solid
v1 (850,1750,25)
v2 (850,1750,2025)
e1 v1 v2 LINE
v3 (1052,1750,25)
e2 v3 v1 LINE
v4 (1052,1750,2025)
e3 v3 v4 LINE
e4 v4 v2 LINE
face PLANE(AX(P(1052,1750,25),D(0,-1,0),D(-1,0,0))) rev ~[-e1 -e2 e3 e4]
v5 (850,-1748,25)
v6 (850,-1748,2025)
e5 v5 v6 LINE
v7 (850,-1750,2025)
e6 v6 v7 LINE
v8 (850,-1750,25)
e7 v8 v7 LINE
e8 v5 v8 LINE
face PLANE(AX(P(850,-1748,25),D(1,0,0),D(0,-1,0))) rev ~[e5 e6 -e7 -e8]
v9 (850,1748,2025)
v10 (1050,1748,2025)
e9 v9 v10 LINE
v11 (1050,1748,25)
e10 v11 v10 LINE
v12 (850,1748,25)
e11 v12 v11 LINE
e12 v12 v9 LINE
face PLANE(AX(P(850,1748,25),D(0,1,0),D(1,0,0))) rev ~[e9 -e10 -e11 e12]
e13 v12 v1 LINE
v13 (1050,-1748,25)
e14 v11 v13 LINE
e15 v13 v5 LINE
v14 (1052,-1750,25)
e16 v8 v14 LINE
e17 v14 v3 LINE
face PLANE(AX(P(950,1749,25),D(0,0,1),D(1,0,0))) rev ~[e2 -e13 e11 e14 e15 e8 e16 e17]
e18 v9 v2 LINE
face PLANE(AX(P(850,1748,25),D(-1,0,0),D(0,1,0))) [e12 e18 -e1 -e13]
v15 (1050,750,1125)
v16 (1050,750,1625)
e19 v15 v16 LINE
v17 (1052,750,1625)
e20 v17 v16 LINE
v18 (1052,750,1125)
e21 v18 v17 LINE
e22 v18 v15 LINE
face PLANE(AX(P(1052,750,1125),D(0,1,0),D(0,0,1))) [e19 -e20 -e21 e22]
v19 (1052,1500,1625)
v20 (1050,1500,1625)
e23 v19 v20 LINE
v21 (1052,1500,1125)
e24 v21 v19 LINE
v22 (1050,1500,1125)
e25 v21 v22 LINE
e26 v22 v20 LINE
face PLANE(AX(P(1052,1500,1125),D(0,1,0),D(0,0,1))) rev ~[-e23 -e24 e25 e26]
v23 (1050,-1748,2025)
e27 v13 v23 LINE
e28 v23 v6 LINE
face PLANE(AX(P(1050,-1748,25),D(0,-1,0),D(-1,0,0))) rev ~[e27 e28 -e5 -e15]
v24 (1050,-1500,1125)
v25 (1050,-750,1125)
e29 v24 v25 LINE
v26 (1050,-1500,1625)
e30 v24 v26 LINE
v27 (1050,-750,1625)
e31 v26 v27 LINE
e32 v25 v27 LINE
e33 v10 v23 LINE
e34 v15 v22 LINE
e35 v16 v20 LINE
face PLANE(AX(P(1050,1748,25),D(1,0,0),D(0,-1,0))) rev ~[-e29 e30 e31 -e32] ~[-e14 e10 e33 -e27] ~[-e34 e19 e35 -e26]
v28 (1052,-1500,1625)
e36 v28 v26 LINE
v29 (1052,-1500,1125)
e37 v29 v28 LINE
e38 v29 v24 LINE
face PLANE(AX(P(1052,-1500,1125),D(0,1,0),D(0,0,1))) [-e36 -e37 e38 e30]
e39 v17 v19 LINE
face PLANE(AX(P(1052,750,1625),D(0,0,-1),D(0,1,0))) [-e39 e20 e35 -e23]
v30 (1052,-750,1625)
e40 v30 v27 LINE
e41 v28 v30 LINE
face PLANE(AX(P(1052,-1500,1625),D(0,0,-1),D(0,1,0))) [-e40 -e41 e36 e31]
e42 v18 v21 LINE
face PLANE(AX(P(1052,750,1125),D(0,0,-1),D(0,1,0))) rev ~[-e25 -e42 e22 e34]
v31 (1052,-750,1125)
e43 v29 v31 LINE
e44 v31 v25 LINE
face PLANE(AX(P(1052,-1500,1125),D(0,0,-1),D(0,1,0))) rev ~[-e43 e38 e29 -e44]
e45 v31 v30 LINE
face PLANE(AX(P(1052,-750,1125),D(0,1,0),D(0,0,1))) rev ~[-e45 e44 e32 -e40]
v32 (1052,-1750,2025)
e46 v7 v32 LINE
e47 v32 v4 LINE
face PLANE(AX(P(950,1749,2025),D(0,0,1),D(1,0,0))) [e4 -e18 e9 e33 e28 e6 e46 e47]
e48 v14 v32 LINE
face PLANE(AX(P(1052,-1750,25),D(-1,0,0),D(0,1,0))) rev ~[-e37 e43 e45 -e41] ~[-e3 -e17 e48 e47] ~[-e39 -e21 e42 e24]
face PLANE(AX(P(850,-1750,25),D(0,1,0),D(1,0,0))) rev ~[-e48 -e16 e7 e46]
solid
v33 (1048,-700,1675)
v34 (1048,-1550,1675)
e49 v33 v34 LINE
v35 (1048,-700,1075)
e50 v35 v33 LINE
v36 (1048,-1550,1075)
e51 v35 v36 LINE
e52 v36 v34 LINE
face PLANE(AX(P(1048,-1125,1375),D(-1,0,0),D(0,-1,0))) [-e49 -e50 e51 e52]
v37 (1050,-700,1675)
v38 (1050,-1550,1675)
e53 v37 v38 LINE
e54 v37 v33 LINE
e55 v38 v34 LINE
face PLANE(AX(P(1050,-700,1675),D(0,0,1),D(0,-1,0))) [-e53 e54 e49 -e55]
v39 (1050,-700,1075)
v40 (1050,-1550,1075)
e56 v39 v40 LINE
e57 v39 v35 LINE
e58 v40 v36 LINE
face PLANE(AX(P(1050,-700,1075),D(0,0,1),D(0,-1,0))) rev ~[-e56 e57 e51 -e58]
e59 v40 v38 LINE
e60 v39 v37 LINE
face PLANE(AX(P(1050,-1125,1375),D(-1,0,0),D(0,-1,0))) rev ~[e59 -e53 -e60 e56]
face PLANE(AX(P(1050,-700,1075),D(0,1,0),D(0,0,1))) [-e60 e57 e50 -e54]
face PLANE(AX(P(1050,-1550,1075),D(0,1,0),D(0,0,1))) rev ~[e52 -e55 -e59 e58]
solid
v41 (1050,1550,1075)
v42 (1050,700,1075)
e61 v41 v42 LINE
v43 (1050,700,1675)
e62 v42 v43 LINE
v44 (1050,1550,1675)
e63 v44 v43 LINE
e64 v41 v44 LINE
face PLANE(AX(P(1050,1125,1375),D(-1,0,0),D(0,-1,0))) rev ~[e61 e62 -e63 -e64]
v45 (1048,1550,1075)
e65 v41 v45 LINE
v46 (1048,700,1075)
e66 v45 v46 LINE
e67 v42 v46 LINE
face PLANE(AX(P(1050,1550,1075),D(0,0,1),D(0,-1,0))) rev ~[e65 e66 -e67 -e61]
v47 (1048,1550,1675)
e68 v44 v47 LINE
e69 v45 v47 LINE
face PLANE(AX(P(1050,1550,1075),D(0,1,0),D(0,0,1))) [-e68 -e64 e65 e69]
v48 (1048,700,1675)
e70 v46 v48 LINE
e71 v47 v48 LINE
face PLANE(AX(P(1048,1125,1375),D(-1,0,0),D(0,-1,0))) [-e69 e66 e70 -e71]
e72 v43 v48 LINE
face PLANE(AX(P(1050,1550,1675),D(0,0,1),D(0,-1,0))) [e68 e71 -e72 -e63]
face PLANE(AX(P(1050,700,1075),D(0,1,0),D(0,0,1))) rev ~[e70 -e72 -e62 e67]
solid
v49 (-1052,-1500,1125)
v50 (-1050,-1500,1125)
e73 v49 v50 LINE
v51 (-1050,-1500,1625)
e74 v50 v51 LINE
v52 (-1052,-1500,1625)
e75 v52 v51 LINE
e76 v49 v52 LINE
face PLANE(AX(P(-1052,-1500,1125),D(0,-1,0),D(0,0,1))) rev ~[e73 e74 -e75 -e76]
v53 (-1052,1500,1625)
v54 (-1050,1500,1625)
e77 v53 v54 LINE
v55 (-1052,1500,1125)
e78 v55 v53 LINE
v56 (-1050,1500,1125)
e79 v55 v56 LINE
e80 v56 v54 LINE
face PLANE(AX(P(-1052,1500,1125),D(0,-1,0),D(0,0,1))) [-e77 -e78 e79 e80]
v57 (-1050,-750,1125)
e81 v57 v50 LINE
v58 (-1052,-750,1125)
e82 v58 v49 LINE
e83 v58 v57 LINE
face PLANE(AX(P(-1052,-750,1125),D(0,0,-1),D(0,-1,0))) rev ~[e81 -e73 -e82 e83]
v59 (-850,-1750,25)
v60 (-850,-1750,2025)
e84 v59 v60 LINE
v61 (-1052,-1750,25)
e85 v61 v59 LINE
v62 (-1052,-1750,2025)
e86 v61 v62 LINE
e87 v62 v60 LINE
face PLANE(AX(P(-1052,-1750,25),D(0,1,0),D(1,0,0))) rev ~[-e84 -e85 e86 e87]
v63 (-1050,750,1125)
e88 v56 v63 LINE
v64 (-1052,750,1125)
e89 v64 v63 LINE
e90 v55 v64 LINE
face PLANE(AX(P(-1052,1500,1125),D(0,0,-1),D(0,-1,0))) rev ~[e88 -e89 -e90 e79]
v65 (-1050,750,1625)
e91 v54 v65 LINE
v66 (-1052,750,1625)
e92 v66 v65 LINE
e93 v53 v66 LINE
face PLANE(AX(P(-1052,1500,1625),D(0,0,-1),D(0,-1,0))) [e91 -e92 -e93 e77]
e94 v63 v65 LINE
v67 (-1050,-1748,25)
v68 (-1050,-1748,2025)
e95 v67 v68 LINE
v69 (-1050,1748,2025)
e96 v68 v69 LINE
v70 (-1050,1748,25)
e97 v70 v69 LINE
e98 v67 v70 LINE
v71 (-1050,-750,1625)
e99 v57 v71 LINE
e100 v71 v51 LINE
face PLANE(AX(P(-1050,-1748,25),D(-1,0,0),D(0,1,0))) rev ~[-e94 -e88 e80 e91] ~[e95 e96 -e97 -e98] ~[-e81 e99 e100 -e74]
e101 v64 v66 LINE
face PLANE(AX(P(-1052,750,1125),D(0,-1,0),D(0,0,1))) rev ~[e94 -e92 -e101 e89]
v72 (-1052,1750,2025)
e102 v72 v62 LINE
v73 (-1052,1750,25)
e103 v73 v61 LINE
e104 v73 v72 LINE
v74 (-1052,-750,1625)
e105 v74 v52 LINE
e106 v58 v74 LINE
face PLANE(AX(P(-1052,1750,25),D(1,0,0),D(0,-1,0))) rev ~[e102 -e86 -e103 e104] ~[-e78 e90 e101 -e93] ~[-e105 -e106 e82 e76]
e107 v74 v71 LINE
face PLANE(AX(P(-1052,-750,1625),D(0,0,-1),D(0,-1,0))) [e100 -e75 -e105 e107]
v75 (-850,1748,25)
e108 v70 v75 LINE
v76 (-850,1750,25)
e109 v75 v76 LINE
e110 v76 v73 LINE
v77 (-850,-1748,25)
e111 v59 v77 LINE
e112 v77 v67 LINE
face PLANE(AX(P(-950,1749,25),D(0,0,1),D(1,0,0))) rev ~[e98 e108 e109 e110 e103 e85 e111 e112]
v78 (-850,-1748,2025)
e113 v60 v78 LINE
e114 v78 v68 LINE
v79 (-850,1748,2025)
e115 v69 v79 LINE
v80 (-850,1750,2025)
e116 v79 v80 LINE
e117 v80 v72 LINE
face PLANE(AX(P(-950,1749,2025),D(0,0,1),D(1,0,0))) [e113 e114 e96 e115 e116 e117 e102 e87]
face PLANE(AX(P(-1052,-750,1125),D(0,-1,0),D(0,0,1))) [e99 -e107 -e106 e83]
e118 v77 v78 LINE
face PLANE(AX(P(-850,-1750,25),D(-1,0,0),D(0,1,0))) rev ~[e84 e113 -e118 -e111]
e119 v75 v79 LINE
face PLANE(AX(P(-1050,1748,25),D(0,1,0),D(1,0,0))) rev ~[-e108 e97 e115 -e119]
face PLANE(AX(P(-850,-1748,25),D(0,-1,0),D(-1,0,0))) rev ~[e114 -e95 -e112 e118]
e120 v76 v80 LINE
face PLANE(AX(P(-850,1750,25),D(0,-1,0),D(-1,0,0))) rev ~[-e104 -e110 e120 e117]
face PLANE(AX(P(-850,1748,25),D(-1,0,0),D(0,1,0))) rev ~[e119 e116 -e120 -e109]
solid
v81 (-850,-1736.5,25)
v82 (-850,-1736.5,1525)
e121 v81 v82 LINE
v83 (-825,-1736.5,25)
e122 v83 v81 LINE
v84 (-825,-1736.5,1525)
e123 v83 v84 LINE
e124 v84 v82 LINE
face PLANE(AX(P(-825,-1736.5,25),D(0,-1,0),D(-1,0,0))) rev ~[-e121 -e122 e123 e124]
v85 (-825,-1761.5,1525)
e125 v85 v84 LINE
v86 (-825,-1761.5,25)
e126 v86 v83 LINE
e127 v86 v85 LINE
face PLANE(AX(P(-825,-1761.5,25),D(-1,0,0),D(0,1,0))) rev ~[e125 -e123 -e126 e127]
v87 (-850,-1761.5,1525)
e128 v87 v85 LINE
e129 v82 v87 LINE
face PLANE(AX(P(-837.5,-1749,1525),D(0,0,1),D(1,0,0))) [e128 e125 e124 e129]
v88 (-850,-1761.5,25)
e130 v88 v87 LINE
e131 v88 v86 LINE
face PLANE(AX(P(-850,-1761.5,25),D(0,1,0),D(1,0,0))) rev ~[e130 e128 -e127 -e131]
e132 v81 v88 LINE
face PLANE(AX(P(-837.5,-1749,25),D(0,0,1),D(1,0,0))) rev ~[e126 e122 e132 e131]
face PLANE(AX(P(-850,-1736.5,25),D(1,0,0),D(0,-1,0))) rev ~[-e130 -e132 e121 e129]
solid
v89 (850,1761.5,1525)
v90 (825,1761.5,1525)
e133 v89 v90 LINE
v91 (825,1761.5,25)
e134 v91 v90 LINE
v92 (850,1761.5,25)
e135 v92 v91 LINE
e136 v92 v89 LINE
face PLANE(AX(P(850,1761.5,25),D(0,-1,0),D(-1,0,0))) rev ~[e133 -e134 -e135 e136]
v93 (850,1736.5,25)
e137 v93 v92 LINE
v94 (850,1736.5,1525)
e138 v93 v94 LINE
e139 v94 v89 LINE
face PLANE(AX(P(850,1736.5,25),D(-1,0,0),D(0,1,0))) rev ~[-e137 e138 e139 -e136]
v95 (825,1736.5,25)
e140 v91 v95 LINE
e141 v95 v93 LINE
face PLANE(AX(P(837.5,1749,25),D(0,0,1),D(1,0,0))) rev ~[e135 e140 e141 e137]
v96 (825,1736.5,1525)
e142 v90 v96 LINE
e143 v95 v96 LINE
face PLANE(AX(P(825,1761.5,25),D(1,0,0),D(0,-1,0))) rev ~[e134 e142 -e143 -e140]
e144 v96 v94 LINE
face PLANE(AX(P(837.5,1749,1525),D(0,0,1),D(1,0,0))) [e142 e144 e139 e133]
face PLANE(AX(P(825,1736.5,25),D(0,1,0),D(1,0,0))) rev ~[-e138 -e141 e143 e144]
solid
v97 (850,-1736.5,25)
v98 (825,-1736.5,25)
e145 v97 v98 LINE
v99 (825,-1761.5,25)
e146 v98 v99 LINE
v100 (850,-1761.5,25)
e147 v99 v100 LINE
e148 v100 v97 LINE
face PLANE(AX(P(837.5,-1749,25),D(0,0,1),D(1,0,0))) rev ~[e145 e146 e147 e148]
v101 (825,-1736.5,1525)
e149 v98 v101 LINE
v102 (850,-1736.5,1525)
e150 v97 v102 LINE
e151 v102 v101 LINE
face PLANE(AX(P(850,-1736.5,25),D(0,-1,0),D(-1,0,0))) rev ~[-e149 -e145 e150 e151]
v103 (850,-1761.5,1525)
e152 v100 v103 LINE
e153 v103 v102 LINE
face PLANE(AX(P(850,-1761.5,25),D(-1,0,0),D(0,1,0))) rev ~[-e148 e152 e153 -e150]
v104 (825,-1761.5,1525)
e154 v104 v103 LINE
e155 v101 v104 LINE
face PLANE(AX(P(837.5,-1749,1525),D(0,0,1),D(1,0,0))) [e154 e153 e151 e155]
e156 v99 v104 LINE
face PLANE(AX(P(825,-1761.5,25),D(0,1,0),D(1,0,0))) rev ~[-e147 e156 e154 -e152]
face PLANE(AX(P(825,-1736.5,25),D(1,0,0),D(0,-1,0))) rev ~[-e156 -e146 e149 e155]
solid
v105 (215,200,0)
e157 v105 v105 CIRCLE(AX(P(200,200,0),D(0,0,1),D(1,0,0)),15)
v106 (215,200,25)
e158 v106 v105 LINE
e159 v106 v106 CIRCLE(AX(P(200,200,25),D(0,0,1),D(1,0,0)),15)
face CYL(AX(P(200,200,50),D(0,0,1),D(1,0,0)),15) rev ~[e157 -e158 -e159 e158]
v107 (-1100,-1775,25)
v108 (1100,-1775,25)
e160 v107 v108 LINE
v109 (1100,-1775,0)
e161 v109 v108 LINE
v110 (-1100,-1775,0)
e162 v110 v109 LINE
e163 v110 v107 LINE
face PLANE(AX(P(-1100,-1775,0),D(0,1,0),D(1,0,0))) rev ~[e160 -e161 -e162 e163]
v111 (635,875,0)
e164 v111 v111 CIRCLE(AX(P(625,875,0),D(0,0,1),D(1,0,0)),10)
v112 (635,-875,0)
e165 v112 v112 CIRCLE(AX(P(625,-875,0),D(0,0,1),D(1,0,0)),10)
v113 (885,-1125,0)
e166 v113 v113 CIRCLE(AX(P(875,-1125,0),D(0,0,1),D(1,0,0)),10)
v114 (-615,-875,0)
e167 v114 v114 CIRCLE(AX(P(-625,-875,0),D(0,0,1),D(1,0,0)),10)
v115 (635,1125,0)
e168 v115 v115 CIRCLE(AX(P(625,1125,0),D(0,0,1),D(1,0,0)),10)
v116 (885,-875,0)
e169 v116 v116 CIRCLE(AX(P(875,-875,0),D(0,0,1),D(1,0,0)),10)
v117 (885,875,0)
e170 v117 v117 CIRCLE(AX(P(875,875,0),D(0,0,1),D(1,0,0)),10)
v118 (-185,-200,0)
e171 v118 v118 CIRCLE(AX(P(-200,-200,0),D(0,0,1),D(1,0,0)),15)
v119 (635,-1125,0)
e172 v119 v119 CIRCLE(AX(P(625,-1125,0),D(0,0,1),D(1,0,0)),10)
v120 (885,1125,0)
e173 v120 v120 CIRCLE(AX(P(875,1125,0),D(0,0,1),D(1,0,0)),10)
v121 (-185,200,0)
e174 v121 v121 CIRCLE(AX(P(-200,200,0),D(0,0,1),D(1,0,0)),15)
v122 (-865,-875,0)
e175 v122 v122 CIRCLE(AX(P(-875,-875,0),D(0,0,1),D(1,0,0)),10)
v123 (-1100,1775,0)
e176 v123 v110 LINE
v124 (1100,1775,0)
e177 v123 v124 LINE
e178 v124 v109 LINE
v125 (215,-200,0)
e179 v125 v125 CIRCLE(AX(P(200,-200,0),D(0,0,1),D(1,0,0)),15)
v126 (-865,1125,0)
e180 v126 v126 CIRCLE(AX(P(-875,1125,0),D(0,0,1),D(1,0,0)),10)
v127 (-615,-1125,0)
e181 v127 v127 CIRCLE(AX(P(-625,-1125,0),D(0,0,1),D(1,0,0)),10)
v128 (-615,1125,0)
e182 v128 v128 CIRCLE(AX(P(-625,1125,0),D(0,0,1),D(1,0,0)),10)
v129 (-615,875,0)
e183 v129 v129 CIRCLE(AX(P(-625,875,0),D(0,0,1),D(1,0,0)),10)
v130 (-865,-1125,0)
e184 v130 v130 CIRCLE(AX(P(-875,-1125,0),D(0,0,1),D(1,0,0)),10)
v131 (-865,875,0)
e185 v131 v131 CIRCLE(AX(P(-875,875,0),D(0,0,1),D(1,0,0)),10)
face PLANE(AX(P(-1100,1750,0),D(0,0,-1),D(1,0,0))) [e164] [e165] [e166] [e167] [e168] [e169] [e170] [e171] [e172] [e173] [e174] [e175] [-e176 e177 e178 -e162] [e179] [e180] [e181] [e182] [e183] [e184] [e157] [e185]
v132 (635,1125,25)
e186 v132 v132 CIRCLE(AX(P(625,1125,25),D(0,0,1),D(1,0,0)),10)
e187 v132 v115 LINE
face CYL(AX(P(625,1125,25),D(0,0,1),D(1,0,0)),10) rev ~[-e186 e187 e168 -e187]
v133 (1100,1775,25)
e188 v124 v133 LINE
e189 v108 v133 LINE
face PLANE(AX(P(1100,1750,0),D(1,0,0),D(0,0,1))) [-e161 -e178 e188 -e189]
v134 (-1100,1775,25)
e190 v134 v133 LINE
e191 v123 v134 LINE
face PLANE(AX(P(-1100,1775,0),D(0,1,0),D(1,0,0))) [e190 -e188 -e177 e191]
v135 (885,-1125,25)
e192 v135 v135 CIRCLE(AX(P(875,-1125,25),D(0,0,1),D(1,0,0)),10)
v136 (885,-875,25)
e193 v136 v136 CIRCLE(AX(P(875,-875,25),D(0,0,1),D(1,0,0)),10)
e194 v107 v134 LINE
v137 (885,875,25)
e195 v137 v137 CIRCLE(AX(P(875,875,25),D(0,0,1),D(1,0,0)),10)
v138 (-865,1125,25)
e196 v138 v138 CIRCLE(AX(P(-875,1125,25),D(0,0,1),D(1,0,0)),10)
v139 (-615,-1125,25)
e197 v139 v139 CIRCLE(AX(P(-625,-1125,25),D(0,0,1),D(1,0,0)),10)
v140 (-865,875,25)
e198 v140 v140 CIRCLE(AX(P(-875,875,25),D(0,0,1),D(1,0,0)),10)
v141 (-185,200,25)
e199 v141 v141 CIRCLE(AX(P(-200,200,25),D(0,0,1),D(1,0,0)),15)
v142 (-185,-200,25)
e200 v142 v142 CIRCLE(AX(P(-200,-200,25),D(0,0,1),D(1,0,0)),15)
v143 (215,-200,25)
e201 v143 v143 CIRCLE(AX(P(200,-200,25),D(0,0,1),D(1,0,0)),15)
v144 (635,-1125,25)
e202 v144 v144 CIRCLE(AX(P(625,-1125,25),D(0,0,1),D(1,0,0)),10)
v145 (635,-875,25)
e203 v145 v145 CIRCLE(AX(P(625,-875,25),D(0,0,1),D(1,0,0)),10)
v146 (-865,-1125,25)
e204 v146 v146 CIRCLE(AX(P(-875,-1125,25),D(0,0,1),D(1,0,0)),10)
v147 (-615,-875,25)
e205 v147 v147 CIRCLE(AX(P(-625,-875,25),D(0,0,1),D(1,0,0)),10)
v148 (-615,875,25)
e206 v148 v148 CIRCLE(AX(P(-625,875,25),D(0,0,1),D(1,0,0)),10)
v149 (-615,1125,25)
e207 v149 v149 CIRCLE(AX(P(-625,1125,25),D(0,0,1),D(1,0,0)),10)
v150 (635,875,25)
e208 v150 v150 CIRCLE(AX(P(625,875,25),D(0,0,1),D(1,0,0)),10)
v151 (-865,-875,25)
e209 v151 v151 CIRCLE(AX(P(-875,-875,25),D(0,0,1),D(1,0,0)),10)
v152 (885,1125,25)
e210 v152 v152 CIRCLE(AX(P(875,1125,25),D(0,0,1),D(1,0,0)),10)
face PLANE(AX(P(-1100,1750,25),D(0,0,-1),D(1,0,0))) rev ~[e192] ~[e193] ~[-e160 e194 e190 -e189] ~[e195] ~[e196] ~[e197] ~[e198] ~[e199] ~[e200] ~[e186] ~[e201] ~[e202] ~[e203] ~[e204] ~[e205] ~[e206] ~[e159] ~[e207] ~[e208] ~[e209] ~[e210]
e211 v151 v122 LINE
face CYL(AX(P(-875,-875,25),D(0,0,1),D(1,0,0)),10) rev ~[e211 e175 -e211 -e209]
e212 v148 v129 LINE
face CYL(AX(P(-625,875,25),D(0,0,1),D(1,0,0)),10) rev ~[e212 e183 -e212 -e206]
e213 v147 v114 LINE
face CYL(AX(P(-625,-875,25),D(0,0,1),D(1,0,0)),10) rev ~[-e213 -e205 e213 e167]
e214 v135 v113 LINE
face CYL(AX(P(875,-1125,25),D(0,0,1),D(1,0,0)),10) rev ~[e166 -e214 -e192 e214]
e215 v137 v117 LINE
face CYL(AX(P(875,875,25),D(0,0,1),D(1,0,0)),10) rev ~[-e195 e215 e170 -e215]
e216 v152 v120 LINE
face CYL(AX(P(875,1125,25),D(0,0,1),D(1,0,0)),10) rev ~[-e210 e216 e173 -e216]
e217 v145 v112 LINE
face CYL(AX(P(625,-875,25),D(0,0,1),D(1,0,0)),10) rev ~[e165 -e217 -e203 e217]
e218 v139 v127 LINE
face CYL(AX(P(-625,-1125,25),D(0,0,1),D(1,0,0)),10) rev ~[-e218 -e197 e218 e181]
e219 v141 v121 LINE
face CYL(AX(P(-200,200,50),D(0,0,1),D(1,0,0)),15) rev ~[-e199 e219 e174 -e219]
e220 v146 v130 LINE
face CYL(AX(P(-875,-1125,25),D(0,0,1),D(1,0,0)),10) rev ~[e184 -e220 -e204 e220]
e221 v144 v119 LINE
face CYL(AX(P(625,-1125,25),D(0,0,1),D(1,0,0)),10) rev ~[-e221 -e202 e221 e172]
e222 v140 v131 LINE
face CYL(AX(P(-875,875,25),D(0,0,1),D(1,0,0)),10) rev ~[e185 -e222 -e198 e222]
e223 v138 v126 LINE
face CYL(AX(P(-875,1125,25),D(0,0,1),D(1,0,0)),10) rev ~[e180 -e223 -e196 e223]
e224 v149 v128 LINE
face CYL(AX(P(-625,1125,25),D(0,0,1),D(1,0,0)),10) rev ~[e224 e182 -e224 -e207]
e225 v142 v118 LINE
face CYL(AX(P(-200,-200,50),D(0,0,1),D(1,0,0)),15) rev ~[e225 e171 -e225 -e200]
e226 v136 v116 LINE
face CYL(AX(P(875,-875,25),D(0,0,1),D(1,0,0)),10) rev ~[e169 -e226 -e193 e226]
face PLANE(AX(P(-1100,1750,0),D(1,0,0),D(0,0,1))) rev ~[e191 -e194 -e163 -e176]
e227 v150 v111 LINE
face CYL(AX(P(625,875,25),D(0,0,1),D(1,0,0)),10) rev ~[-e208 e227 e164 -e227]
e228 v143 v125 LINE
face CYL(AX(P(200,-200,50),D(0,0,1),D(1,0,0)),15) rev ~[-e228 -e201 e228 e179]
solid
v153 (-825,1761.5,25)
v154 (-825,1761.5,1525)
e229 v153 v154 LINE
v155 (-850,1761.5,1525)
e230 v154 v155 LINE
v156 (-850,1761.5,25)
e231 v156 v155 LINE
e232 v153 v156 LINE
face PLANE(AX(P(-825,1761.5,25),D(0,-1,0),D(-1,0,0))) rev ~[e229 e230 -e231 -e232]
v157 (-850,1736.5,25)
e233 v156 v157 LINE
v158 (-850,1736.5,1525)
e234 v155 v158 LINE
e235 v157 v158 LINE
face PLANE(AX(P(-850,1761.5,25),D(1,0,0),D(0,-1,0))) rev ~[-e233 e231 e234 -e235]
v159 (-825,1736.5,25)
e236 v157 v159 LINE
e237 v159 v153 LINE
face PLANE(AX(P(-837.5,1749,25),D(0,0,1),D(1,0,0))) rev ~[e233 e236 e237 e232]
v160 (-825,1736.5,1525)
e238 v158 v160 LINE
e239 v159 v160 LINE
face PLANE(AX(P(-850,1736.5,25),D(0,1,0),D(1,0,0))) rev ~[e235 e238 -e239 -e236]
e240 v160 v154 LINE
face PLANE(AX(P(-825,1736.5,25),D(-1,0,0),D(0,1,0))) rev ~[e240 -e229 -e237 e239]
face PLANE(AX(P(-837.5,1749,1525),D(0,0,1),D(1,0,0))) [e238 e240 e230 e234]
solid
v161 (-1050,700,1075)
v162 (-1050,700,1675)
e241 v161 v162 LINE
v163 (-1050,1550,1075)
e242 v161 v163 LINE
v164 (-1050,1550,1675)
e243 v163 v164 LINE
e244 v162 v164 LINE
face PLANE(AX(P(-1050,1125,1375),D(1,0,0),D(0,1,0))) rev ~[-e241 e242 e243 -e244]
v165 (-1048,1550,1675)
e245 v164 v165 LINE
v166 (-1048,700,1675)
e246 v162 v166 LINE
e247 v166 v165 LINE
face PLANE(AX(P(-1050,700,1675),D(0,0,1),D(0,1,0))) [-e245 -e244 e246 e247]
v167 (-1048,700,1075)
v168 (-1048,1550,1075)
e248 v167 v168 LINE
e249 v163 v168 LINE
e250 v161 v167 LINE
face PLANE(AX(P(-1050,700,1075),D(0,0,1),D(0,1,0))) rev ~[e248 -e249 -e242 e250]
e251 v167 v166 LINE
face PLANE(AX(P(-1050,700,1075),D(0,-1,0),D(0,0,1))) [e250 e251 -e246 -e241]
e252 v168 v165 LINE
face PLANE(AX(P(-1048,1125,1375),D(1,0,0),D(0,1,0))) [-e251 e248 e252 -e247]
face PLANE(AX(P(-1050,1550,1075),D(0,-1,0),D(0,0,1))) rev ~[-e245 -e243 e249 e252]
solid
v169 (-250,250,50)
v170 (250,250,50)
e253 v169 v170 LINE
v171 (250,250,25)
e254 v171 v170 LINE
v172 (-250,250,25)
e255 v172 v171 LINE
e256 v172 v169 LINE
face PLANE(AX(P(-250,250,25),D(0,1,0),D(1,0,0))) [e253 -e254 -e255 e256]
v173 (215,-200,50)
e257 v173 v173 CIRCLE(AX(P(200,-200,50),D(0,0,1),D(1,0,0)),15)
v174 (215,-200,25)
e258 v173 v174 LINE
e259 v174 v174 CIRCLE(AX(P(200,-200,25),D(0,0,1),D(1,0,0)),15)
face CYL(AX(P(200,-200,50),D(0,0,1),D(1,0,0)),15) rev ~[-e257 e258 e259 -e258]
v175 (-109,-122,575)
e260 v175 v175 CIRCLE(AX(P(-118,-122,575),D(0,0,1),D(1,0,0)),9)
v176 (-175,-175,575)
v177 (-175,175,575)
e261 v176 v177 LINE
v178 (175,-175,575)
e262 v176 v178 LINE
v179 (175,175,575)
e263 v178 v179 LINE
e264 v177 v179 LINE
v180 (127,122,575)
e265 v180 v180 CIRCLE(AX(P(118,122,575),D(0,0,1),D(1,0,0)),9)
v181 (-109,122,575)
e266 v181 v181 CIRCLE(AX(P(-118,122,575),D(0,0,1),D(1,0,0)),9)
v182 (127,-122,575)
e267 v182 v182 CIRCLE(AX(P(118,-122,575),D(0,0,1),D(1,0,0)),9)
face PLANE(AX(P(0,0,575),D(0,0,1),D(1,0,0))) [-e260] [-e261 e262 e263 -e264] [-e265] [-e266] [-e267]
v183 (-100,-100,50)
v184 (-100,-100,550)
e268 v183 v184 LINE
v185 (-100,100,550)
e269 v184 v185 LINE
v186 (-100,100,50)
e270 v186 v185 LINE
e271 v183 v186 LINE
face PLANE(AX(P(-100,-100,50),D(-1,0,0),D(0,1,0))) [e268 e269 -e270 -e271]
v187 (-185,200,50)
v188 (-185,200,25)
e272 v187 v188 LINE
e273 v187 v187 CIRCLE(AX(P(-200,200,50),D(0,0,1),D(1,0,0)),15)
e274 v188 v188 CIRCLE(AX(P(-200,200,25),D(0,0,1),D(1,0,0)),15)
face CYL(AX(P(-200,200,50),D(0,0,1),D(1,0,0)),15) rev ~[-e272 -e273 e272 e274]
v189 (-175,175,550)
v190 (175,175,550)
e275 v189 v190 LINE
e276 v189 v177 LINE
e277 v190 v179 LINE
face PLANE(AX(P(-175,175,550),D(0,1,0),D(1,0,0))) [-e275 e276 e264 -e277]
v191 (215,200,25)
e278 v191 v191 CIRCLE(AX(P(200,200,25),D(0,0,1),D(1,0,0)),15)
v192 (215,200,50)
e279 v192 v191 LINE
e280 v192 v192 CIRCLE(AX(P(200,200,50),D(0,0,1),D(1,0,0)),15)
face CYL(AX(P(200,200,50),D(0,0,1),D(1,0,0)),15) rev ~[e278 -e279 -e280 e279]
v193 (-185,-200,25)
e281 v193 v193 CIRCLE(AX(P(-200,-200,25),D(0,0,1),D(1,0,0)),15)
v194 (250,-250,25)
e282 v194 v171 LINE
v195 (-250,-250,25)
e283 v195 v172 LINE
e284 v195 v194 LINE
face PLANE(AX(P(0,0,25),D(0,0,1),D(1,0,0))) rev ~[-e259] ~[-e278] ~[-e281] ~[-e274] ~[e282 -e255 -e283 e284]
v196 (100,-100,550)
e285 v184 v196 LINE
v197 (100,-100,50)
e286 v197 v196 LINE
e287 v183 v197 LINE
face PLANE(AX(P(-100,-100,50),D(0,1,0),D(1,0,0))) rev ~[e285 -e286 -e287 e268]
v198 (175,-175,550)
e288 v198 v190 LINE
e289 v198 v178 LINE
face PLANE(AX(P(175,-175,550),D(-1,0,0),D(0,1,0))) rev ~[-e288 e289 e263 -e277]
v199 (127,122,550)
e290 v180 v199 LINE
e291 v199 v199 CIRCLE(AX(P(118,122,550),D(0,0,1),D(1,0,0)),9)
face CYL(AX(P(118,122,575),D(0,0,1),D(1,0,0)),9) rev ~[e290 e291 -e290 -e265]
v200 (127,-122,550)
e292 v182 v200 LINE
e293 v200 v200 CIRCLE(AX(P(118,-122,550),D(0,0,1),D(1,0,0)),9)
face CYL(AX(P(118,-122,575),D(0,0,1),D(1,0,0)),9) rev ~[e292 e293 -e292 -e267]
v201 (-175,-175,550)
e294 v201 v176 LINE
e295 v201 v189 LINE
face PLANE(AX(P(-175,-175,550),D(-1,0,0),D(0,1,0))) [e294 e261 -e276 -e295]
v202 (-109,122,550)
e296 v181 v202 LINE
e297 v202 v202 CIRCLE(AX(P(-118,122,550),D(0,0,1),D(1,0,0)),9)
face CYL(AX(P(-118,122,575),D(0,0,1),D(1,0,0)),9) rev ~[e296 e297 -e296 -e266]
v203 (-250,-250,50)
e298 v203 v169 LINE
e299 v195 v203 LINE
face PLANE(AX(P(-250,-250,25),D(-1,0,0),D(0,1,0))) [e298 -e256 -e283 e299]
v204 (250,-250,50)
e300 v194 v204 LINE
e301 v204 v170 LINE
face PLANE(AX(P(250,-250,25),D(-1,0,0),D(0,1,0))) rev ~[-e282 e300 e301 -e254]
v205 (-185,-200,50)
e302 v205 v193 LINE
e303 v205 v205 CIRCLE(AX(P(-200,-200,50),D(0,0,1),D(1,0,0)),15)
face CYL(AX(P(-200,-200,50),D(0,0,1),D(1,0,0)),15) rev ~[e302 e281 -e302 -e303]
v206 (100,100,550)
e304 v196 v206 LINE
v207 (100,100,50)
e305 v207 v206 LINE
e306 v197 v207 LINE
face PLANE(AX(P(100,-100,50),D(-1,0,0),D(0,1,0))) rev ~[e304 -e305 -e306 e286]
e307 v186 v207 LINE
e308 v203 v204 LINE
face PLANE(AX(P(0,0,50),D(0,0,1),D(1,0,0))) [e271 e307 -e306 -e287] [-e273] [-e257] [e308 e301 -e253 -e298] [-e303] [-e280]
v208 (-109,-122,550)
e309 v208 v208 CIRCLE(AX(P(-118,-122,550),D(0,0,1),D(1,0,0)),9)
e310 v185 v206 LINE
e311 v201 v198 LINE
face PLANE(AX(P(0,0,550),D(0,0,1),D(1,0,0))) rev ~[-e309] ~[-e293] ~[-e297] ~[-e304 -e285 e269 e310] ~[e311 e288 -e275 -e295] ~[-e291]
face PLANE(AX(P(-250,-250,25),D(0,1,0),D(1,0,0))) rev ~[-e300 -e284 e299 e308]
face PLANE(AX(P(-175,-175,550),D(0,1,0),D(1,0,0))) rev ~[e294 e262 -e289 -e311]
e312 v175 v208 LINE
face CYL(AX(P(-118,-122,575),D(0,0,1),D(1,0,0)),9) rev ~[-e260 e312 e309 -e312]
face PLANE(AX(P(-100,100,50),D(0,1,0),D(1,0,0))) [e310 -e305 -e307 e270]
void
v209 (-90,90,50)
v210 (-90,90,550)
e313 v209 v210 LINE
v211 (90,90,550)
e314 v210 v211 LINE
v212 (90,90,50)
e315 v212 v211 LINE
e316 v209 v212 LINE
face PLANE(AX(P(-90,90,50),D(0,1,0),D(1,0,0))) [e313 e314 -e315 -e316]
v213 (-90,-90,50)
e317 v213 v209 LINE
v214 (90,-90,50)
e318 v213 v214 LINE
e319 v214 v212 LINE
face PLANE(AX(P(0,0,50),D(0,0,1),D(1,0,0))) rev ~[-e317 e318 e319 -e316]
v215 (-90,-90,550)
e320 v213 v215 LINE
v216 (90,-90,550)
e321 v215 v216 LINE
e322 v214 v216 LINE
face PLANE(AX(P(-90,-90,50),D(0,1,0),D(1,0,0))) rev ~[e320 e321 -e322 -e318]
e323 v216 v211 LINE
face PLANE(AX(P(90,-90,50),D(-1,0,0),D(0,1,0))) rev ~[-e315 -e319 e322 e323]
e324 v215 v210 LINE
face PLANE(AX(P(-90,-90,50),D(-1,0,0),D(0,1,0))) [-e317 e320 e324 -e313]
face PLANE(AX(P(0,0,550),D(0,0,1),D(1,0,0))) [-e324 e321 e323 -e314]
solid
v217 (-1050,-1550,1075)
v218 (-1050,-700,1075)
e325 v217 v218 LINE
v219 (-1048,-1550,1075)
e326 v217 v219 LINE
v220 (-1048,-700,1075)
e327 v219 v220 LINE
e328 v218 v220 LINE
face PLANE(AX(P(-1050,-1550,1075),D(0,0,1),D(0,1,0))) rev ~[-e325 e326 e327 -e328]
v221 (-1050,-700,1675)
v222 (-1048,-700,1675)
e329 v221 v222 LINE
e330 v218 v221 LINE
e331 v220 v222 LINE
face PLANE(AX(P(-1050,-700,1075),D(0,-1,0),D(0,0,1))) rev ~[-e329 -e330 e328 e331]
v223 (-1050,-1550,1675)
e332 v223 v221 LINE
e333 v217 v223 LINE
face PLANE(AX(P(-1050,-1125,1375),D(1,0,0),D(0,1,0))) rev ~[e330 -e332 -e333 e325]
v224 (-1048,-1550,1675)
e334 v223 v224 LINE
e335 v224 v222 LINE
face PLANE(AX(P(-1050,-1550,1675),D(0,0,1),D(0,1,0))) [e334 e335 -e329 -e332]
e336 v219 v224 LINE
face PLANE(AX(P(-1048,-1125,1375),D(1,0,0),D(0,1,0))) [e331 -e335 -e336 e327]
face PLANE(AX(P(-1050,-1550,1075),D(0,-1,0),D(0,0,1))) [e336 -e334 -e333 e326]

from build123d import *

# Parameters (mm, degrees)
F0_W      = 2200
F0_H      = 3500
F1_DEPTH  = 25
F2_W      = 500
F2_H      = 500
F3_DEPTH  = 25
F4_R      = 15
F5_DEPTH  = 50.001
F6_W      = 200
F6_H      = 200
F6_W_2    = 180
F6_H_2    = 180
F7_DEPTH  = 500
F8_W      = 350
F8_H      = 350
F9_DEPTH  = 25
F10_W     = 200
F10_H     = 2
F11_DEPTH = 2000
F13_W     = 750
F13_H     = 500
F14_DEPTH = 2
F12_W     = 750
F12_H     = 500
F15_DEPTH = 2
F16_W     = 850
F16_H     = 600
F16_W_2   = 750
F16_H_2   = 500
F17_DEPTH = 2
F18_W     = 850
F18_H     = 600
F18_W_2   = 750
F18_H_2   = 500
F19_DEPTH = 2
F20_R     = 10
F21_DEPTH = 25
F22_R     = 9
F23_DEPTH = 25
F24_DEPTH = 25
F25_DEPTH = 25
F27_DEPTH = 1500


with BuildPart() as f1:
    # F0 (on Top) → F1 (new body)
    with BuildSketch(Plane.XY):
        Rectangle(F0_W, F0_H)
    extrude(amount=F1_DEPTH)


with BuildPart() as f3:
    # F2 (on face) → F3 (new body)
    with BuildSketch(Plane.XY.offset(25)):
        Rectangle(F2_W, F2_H)
    extrude(amount=F3_DEPTH)


with BuildPart() as f5_tool:
    # F4 (on face) → F5 (new body, through all)
    with BuildSketch(Plane.XY.offset(50)):
        with Locations((-200, 200)):
            Circle(F4_R)
        with Locations((200, 200)):
            Circle(F4_R)
        with Locations((200, -200)):
            Circle(F4_R)
        with Locations((-200, -200)):
            Circle(F4_R)
    extrude(amount=-F5_DEPTH)


with BuildPart() as f1_1:
    add(f1.part)

    # F5: cut by f5_tool
    add(f5_tool.part, mode=Mode.SUBTRACT)

    # F20 (on face) → F21 (cut, through all)
    with BuildSketch(Plane.XY.offset(25)):
        with Locations((-625, 1125)):
            Circle(F20_R)
        with Locations((-875, 1125)):
            Circle(F20_R)
        with Locations((-625, 875)):
            Circle(F20_R)
        with Locations((-875, 875)):
            Circle(F20_R)
        with Locations((875, 875)):
            Circle(F20_R)
        with Locations((625, 875)):
            Circle(F20_R)
        with Locations((625, 1125)):
            Circle(F20_R)
        with Locations((875, 1125)):
            Circle(F20_R)
        with Locations((875, -1125)):
            Circle(F20_R)
        with Locations((-875, -875)):
            Circle(F20_R)
        with Locations((-625, -875)):
            Circle(F20_R)
        with Locations((-625, -1125)):
            Circle(F20_R)
        with Locations((-875, -1125)):
            Circle(F20_R)
        with Locations((875, -875)):
            Circle(F20_R)
        with Locations((625, -875)):
            Circle(F20_R)
        with Locations((625, -1125)):
            Circle(F20_R)
    extrude(amount=-F21_DEPTH, mode=Mode.SUBTRACT)

    # F24 (add): a face of the model
    f24_faces = [f1_1.faces().sort_by_distance(p)[0] for p in [
        (0, -1750, 12.5),
    ]]
    extrude(f24_faces, amount=F24_DEPTH)

    # F25 (add): a face of the model
    f25_faces = [f1_1.faces().sort_by_distance(p)[0] for p in [
        (0, 1750, 12.5),
    ]]
    extrude(f25_faces, amount=F25_DEPTH)


with BuildPart() as f3_1:
    add(f3.part)

    # F5: cut by f5_tool
    add(f5_tool.part, mode=Mode.SUBTRACT)

    # F6 (on face) → F7 (join)
    with BuildSketch(Plane.XY.offset(50)):
        Rectangle(F6_W, F6_H)
        Rectangle(F6_W_2, F6_H_2, mode=Mode.SUBTRACT)
    extrude(amount=F7_DEPTH)

    # F8 (on face) → F9 (join)
    with BuildSketch(Plane.XY.offset(550)):
        Rectangle(F8_W, F8_H)
    extrude(amount=F9_DEPTH)

    # F22 (on face) → F23 (cut, through all)
    with BuildSketch(Plane.XY.offset(575)):
        with Locations((-118, 122)):
            Circle(F22_R)
        with Locations((118, 122)):
            Circle(F22_R)
        with Locations((-118, -122)):
            Circle(F22_R)
        with Locations((118, -122)):
            Circle(F22_R)
    extrude(amount=-F23_DEPTH, mode=Mode.SUBTRACT)


with BuildPart() as f11:
    # F10 (on face) → F11 (new body)
    with BuildSketch(Plane.XY.offset(25)):
        with Locations((950, 1749)):
            Rectangle(F10_W, F10_H)
        Polygon((1052, 1750), (1050, 1750), (1050, 1748), (1050, -1748), (850, -1748), (850, -1750), (1050, -1750), (1052, -1750), align=None)
    extrude(amount=F11_DEPTH)

    # F12 (on face) → F15 (cut, through all)
    with BuildSketch(Plane.YZ.offset(1052)):
        with Locations((-1125, 1375)):
            Rectangle(F12_W, F12_H)
        with Locations((1125, 1375)):
            Rectangle(F12_W, F12_H)
    extrude(amount=-F15_DEPTH, mode=Mode.SUBTRACT)


with BuildPart() as f11b:
    # F10 (on face) → F11, piece 2 (new body)
    with BuildSketch(Plane.XY.offset(25)):
        with Locations((-950, 1749)):
            Rectangle(F10_W, F10_H)
        Polygon((-1050, 1748), (-1050, 1750), (-1052, 1750), (-1052, -1750), (-1050, -1750), (-850, -1750), (-850, -1748), (-1050, -1748), align=None)
    extrude(amount=F11_DEPTH)

    # F13 (on face) → F14 (cut, through all)
    with BuildSketch(Plane(origin=(-1052, 0, 0), x_dir=(0, -1, 0), z_dir=(-1, 0, 0))):
        with Locations((1125, 1375)):
            Rectangle(F13_W, F13_H)
        with Locations((-1125, 1375)):
            Rectangle(F13_W, F13_H)
    extrude(amount=-F14_DEPTH, mode=Mode.SUBTRACT)


with BuildPart() as f17:
    # F16 (on face) → F17 (new body)
    with BuildSketch(Plane.YZ.offset(-1050)):
        with Locations((-1125, 1375)):
            Rectangle(F16_W, F16_H)
        with Locations((-1125, 1375)):
            Rectangle(F16_W_2, F16_H_2, mode=Mode.SUBTRACT)
        with Locations((-1125, 1375)):
            Rectangle(F16_W_2, F16_H_2)
    extrude(amount=F17_DEPTH)


with BuildPart() as f17b:
    # F16 (on face) → F17, piece 2 (new body)
    with BuildSketch(Plane.YZ.offset(-1050)):
        with Locations((1125, 1375)):
            Rectangle(F16_W, F16_H)
        with Locations((1125, 1375)):
            Rectangle(F16_W_2, F16_H_2, mode=Mode.SUBTRACT)
        with Locations((1125, 1375)):
            Rectangle(F16_W_2, F16_H_2)
    extrude(amount=F17_DEPTH)


with BuildPart() as f19:
    # F18 (on face) → F19 (new body)
    with BuildSketch(Plane(origin=(1050, 0, 0), x_dir=(0, -1, 0), z_dir=(-1, 0, 0))):
        with Locations((-1125, 1375)):
            Rectangle(F18_W, F18_H)
        with Locations((-1125, 1375)):
            Rectangle(F18_W_2, F18_H_2, mode=Mode.SUBTRACT)
        with Locations((-1125, 1375)):
            Rectangle(F18_W_2, F18_H_2)
    extrude(amount=F19_DEPTH)


with BuildPart() as f19b:
    # F18 (on face) → F19, piece 2 (new body)
    with BuildSketch(Plane(origin=(1050, 0, 0), x_dir=(0, -1, 0), z_dir=(-1, 0, 0))):
        with Locations((1125, 1375)):
            Rectangle(F18_W, F18_H)
        with Locations((1125, 1375)):
            Rectangle(F18_W_2, F18_H_2, mode=Mode.SUBTRACT)
        with Locations((1125, 1375)):
            Rectangle(F18_W_2, F18_H_2)
    extrude(amount=F19_DEPTH)


with BuildPart() as f27:
    # F26 (on face) → F27 (new body)
    with BuildSketch(Plane.XY.offset(25)):
        Polygon((850, 1749), (850, 1750), (850, 1761.5), (825, 1761.5), (825, 1736.5), (850, 1736.5), (850, 1748), align=None)
    extrude(amount=F27_DEPTH)


with BuildPart() as f27b:
    # F26 (on face) → F27, piece 2 (new body)
    with BuildSketch(Plane.XY.offset(25)):
        Polygon((-850, 1761.5), (-850, 1750), (-850, 1749), (-850, 1748), (-850, 1736.5), (-825, 1736.5), (-825, 1749), (-825, 1761.5), align=None)
    extrude(amount=F27_DEPTH)


with BuildPart() as f27c:
    # F26 (on face) → F27, piece 3 (new body)
    with BuildSketch(Plane.XY.offset(25)):
        Polygon((-850, -1749), (-850, -1750), (-850, -1761.5), (-825, -1761.5), (-825, -1749), (-825, -1736.5), (-850, -1736.5), (-850, -1748), align=None)
    extrude(amount=F27_DEPTH)


with BuildPart() as f27d:
    # F26 (on face) → F27, piece 4 (new body)
    with BuildSketch(Plane.XY.offset(25)):
        Polygon((850, -1750), (850, -1749), (850, -1748), (850, -1736.5), (825, -1736.5), (825, -1761.5), (850, -1761.5), align=None)
    extrude(amount=F27_DEPTH)


solid = Compound([f1_1.part, f3_1.part, f11.part, f11b.part, f17.part, f17b.part, f19.part, f19b.part, f27.part, f27b.part, f27c.part, f27d.part])
